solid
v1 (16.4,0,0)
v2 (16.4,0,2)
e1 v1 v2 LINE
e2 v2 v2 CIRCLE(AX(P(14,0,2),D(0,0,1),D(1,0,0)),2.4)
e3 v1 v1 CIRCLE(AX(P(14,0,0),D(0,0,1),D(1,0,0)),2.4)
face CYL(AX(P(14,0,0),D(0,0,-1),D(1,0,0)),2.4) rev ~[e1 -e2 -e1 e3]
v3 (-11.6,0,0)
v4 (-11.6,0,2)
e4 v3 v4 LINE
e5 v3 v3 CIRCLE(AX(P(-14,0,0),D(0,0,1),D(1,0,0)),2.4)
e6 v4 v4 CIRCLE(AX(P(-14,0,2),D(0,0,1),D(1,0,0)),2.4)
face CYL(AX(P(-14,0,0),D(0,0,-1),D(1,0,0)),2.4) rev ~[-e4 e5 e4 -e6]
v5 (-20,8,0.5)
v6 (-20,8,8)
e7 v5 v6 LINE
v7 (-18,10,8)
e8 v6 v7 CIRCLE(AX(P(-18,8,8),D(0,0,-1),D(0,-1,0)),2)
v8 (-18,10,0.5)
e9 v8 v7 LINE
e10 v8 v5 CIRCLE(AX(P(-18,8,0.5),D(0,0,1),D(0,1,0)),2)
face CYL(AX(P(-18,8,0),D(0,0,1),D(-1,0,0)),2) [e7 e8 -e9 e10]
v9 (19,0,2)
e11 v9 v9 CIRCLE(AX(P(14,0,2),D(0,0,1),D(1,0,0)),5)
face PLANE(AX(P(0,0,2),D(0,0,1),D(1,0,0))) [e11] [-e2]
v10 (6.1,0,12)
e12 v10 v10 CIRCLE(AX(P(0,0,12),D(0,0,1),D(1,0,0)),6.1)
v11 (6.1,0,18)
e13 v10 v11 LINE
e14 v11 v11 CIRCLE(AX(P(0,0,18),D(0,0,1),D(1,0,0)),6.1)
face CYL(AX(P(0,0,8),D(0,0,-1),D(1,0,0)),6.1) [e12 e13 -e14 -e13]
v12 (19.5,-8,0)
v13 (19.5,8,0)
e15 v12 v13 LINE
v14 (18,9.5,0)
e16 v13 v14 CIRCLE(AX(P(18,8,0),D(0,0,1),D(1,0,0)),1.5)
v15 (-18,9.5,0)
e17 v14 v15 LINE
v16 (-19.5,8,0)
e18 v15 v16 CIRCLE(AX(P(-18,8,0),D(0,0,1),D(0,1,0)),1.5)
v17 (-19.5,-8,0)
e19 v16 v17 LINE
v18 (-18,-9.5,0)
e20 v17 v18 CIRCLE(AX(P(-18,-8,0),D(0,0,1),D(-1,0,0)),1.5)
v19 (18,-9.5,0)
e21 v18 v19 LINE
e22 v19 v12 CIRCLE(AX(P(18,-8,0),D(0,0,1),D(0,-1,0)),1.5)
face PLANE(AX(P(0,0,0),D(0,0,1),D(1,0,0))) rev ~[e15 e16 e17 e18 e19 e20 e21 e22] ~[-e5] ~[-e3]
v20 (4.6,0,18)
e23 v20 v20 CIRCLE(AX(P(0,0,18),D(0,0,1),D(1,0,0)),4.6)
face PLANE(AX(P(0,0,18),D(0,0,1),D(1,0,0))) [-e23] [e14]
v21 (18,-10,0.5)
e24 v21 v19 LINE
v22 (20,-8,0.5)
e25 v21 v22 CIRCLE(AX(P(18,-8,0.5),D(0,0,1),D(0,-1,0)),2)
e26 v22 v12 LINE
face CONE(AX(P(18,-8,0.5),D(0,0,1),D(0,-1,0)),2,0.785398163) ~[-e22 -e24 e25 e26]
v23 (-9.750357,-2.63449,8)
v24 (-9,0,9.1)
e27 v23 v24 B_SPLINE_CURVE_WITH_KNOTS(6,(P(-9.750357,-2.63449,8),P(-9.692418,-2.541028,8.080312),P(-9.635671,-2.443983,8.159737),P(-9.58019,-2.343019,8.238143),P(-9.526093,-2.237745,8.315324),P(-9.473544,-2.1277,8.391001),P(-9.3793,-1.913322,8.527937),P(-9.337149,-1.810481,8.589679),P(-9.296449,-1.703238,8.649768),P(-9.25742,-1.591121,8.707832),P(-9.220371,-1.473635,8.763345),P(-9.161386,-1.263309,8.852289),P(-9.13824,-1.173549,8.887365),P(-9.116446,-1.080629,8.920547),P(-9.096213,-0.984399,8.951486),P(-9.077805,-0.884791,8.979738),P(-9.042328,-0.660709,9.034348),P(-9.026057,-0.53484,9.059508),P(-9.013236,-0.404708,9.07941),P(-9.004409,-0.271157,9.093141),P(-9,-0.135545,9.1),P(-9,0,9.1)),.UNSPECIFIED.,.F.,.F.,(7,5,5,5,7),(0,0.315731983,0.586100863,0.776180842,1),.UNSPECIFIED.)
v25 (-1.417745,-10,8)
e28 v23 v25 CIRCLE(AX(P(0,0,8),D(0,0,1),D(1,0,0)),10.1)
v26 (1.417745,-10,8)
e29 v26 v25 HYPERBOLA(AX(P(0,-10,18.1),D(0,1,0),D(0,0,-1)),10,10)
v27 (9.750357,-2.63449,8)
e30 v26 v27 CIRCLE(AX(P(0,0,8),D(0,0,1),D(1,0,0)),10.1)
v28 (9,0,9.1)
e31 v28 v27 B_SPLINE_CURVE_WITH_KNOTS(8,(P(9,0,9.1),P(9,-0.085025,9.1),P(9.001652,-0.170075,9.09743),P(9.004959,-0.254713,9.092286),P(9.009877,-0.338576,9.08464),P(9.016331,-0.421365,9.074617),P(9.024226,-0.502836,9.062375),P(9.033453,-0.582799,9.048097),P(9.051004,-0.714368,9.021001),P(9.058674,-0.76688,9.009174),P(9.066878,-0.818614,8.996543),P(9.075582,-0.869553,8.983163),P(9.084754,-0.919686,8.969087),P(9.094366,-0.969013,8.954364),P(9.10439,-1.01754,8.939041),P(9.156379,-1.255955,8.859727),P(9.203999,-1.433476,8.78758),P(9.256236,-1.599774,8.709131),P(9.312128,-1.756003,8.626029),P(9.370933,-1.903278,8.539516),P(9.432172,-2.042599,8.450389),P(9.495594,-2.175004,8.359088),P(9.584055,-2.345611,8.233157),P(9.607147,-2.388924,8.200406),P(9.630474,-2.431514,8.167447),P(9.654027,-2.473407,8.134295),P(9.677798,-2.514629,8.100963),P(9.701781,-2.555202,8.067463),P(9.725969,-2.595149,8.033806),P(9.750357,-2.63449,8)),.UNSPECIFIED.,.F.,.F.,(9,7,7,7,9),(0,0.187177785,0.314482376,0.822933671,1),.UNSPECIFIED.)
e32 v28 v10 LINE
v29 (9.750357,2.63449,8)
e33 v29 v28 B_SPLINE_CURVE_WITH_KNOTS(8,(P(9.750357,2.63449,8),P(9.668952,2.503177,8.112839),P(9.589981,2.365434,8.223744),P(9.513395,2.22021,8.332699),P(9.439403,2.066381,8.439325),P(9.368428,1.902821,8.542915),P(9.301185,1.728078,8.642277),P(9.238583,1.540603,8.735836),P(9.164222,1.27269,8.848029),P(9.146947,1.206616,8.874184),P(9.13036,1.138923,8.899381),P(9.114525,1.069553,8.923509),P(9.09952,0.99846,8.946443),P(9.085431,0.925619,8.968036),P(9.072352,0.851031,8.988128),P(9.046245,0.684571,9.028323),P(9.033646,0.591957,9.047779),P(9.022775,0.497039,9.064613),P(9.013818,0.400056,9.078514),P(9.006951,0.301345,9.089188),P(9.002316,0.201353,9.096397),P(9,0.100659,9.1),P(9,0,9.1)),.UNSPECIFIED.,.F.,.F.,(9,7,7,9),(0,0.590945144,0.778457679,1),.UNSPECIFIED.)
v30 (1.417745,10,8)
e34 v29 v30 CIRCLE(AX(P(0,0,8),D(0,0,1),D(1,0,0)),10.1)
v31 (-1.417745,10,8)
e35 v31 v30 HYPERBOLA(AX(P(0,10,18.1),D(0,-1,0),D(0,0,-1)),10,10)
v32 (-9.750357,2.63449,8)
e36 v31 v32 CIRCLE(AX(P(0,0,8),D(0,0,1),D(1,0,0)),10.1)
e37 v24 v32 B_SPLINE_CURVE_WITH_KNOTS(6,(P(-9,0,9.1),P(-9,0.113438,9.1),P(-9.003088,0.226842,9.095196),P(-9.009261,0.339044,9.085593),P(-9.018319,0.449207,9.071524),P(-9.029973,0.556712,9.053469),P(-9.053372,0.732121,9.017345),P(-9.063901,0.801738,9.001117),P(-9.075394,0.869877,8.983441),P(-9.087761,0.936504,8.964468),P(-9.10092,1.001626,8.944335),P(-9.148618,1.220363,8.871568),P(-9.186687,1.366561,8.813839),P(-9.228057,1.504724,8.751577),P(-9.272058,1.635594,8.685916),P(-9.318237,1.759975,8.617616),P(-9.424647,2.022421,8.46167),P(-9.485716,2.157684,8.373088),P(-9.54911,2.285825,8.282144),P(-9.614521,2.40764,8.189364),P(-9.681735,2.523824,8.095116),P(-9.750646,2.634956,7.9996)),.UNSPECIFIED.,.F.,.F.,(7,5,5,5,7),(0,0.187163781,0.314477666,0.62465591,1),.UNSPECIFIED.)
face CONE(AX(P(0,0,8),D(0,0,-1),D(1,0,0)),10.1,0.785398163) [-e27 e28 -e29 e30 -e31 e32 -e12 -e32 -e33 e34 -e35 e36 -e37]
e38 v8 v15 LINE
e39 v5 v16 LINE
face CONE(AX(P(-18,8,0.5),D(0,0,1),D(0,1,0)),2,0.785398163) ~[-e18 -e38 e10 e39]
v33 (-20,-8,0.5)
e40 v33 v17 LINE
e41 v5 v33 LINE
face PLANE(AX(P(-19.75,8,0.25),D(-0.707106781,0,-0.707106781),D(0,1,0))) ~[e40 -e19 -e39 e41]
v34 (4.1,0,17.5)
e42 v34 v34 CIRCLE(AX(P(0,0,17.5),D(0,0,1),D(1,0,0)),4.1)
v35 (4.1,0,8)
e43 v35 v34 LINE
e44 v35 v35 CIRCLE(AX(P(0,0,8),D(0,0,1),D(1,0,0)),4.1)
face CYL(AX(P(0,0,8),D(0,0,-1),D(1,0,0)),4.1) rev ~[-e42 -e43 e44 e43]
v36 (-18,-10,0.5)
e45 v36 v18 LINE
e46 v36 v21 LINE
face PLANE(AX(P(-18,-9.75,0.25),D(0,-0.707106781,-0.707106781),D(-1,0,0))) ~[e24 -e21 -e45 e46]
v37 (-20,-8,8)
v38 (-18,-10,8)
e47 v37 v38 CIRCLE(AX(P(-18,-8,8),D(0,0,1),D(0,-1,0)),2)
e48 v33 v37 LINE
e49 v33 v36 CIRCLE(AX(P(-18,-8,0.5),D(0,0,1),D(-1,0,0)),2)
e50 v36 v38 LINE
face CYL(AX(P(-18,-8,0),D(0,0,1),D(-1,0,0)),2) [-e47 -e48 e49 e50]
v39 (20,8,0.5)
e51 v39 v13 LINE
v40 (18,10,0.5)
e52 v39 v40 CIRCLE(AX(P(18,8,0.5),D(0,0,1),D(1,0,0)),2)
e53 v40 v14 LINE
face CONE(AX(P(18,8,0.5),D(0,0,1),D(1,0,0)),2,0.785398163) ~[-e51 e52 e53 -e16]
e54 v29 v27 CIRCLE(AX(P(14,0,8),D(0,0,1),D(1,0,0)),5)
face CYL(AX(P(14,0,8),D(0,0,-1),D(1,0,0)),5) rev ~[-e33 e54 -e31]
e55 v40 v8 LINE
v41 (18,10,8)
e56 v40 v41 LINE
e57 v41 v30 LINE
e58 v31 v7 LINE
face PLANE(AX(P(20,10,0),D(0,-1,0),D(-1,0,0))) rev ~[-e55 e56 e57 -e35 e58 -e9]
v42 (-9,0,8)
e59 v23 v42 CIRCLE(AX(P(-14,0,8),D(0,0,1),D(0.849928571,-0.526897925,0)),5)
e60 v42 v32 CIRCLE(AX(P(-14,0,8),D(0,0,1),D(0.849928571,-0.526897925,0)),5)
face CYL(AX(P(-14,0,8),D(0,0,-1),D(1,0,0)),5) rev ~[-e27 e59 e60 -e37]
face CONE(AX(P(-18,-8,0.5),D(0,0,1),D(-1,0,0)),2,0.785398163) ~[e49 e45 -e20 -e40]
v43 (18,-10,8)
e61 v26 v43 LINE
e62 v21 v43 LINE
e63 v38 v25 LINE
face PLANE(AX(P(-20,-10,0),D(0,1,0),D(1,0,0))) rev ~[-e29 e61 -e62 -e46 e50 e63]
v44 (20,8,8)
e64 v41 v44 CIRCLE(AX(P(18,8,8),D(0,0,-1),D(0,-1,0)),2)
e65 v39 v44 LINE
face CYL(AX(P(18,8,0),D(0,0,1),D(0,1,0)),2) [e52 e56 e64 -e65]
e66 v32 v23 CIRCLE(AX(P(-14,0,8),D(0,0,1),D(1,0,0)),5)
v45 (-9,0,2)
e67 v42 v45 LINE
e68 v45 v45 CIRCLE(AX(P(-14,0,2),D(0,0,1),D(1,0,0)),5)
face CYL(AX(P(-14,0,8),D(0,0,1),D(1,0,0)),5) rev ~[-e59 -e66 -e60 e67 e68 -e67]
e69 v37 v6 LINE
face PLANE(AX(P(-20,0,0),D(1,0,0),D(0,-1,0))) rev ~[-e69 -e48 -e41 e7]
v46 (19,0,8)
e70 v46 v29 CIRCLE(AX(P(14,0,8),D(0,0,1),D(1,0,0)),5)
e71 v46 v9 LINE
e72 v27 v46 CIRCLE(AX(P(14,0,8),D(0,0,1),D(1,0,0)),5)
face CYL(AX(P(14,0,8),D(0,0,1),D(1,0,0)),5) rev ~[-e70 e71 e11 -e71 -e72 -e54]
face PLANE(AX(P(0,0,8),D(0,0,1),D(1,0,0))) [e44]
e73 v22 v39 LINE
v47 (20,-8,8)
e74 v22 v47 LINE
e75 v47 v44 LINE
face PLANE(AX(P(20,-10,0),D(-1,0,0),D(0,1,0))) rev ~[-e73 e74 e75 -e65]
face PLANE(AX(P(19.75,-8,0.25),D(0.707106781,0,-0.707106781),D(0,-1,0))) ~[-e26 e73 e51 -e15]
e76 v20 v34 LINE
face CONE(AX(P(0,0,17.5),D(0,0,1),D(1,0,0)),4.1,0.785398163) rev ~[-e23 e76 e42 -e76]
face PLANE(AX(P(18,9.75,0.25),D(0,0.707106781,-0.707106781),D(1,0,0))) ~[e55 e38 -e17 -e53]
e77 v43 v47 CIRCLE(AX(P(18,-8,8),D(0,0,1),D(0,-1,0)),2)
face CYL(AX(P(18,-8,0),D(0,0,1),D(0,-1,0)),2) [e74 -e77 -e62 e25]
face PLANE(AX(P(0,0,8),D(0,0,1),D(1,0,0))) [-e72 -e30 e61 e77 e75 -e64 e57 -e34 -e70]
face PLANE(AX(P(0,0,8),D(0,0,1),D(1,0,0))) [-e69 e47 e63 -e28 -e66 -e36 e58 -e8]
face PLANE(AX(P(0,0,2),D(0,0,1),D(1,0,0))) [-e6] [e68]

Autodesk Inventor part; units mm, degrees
ref_plane "YZ Plane" through (0, 0, 0) normal (1, 0, 0) x (0, 1, 0)
ref_plane "XZ Plane" through (0, 0, 0) normal (0, 1, 0) x (-1, 0, 0)
ref_plane "XY Plane" through (0, 0, 0) normal (0, 0, 1) x (1, 0, 0)
sketch "Sketch1" plane through (0, 0, 0) normal (0, 0, 1) x (1, 0, 0)
  line L0 (-20, -10) -> (20, -10)
  line L1 (20, -10) -> (20, 10)
  line L2 (20, 10) -> (-20, 10)
  line L3 (-20, 10) -> (-20, -10)
  line L4 (-20, -10) -> (20, 10) construction
  line L5 (20, -10) -> (-20, 10) construction
  line L6 (-28, 0) -> (28, 0) projected
  circle A0 centre (-14, 0) radius 2.4
  circle A1 centre (14, 0) radius 2.4
  point P0 (0, 0)
  dimension "d0" = 40
  dimension "d1" = 20
  dimension "d2" = 4.8
  dimension "d3" = 4.8
  dimension "d4" = 6
  dimension "d5" = 6
extrude "Extrusion1" add sketch "Sketch1" along normal blind 8 contours L3 L6 A0 A1 L1 L0 | L3 L2 L1 L6 A1 A0
fillet "Fillet1" radius 2 4 edges at (20, -10, 4) (20, 10, 4) (-20, 10, 4) (-20, -10, 4)
sketch "Sketch2" plane through (0, 0, 8) normal (0, 0, 1) x (1, 0, 0)
  circle A0 centre (0, 0) radius 4.1
  circle A1 centre (0, 0) radius 6.1
  dimension "d9" = 8.2
  dimension "d24" = 2
extrude "Extrusion2" add sketch "Sketch2" along normal blind 10
chamfer "Chamfer1" distance 4 angle 45 1 edges at (-6.1, 0, 8)
chamfer "Chamfer2" distance 0.5 angle 45 1 edges at (-4.1, 0, 18)
sketch "Sketch5" plane through (0, 0, 8) normal (0, 0, 1) x (1, 0, 0)
  circle A0 centre (-14, 0) radius 2.4 projected
  line L0 (-28, 0) -> (28, 0) construction
  line L1 (0, -14) -> (0, 14) projected
  circle A1 centre (-14, 0) radius 5
  circle A2 centre (14, 0) radius 2.4
  circle A3 centre (14, 0) radius 5
  point P0 (0, 0)
  dimension "d28" = 10
extrude "Extrusion4" cut sketch "Sketch5" along normal blind 8
sketch "Sketch6" plane through (0, 0, 8) normal (0, 0, 1) x (1, 0, 0)
  circle A0 centre (14, 0) radius 2.4 projected
  circle A1 centre (-14, 0) radius 2.4 projected
  circle A2 centre (14, 0) radius 5
  circle A3 centre (-14, 0) radius 5
  point P0 (0, 0)
  dimension "d31" = 10
  dimension "d32" = 10
extrude "Extrusion5" cut sketch "Sketch6" against normal blind 6
chamfer "Chamfer3" distance 0.5 angle 45 8 edges at (0, -10, 0) (19.4142, -9.4142, 0) (20, 0, 0) (19.4142, 9.4142, 0) (0, 10, 0) (-19.4142, 9.4142, 0) (-20, 0, 0) (-19.4142, -9.4142, 0)
equation "\"d3\" = d2"
equation "\"d5\" = d4"
equation "\"d32\" = d31"
properties part number "_3DPrint"
